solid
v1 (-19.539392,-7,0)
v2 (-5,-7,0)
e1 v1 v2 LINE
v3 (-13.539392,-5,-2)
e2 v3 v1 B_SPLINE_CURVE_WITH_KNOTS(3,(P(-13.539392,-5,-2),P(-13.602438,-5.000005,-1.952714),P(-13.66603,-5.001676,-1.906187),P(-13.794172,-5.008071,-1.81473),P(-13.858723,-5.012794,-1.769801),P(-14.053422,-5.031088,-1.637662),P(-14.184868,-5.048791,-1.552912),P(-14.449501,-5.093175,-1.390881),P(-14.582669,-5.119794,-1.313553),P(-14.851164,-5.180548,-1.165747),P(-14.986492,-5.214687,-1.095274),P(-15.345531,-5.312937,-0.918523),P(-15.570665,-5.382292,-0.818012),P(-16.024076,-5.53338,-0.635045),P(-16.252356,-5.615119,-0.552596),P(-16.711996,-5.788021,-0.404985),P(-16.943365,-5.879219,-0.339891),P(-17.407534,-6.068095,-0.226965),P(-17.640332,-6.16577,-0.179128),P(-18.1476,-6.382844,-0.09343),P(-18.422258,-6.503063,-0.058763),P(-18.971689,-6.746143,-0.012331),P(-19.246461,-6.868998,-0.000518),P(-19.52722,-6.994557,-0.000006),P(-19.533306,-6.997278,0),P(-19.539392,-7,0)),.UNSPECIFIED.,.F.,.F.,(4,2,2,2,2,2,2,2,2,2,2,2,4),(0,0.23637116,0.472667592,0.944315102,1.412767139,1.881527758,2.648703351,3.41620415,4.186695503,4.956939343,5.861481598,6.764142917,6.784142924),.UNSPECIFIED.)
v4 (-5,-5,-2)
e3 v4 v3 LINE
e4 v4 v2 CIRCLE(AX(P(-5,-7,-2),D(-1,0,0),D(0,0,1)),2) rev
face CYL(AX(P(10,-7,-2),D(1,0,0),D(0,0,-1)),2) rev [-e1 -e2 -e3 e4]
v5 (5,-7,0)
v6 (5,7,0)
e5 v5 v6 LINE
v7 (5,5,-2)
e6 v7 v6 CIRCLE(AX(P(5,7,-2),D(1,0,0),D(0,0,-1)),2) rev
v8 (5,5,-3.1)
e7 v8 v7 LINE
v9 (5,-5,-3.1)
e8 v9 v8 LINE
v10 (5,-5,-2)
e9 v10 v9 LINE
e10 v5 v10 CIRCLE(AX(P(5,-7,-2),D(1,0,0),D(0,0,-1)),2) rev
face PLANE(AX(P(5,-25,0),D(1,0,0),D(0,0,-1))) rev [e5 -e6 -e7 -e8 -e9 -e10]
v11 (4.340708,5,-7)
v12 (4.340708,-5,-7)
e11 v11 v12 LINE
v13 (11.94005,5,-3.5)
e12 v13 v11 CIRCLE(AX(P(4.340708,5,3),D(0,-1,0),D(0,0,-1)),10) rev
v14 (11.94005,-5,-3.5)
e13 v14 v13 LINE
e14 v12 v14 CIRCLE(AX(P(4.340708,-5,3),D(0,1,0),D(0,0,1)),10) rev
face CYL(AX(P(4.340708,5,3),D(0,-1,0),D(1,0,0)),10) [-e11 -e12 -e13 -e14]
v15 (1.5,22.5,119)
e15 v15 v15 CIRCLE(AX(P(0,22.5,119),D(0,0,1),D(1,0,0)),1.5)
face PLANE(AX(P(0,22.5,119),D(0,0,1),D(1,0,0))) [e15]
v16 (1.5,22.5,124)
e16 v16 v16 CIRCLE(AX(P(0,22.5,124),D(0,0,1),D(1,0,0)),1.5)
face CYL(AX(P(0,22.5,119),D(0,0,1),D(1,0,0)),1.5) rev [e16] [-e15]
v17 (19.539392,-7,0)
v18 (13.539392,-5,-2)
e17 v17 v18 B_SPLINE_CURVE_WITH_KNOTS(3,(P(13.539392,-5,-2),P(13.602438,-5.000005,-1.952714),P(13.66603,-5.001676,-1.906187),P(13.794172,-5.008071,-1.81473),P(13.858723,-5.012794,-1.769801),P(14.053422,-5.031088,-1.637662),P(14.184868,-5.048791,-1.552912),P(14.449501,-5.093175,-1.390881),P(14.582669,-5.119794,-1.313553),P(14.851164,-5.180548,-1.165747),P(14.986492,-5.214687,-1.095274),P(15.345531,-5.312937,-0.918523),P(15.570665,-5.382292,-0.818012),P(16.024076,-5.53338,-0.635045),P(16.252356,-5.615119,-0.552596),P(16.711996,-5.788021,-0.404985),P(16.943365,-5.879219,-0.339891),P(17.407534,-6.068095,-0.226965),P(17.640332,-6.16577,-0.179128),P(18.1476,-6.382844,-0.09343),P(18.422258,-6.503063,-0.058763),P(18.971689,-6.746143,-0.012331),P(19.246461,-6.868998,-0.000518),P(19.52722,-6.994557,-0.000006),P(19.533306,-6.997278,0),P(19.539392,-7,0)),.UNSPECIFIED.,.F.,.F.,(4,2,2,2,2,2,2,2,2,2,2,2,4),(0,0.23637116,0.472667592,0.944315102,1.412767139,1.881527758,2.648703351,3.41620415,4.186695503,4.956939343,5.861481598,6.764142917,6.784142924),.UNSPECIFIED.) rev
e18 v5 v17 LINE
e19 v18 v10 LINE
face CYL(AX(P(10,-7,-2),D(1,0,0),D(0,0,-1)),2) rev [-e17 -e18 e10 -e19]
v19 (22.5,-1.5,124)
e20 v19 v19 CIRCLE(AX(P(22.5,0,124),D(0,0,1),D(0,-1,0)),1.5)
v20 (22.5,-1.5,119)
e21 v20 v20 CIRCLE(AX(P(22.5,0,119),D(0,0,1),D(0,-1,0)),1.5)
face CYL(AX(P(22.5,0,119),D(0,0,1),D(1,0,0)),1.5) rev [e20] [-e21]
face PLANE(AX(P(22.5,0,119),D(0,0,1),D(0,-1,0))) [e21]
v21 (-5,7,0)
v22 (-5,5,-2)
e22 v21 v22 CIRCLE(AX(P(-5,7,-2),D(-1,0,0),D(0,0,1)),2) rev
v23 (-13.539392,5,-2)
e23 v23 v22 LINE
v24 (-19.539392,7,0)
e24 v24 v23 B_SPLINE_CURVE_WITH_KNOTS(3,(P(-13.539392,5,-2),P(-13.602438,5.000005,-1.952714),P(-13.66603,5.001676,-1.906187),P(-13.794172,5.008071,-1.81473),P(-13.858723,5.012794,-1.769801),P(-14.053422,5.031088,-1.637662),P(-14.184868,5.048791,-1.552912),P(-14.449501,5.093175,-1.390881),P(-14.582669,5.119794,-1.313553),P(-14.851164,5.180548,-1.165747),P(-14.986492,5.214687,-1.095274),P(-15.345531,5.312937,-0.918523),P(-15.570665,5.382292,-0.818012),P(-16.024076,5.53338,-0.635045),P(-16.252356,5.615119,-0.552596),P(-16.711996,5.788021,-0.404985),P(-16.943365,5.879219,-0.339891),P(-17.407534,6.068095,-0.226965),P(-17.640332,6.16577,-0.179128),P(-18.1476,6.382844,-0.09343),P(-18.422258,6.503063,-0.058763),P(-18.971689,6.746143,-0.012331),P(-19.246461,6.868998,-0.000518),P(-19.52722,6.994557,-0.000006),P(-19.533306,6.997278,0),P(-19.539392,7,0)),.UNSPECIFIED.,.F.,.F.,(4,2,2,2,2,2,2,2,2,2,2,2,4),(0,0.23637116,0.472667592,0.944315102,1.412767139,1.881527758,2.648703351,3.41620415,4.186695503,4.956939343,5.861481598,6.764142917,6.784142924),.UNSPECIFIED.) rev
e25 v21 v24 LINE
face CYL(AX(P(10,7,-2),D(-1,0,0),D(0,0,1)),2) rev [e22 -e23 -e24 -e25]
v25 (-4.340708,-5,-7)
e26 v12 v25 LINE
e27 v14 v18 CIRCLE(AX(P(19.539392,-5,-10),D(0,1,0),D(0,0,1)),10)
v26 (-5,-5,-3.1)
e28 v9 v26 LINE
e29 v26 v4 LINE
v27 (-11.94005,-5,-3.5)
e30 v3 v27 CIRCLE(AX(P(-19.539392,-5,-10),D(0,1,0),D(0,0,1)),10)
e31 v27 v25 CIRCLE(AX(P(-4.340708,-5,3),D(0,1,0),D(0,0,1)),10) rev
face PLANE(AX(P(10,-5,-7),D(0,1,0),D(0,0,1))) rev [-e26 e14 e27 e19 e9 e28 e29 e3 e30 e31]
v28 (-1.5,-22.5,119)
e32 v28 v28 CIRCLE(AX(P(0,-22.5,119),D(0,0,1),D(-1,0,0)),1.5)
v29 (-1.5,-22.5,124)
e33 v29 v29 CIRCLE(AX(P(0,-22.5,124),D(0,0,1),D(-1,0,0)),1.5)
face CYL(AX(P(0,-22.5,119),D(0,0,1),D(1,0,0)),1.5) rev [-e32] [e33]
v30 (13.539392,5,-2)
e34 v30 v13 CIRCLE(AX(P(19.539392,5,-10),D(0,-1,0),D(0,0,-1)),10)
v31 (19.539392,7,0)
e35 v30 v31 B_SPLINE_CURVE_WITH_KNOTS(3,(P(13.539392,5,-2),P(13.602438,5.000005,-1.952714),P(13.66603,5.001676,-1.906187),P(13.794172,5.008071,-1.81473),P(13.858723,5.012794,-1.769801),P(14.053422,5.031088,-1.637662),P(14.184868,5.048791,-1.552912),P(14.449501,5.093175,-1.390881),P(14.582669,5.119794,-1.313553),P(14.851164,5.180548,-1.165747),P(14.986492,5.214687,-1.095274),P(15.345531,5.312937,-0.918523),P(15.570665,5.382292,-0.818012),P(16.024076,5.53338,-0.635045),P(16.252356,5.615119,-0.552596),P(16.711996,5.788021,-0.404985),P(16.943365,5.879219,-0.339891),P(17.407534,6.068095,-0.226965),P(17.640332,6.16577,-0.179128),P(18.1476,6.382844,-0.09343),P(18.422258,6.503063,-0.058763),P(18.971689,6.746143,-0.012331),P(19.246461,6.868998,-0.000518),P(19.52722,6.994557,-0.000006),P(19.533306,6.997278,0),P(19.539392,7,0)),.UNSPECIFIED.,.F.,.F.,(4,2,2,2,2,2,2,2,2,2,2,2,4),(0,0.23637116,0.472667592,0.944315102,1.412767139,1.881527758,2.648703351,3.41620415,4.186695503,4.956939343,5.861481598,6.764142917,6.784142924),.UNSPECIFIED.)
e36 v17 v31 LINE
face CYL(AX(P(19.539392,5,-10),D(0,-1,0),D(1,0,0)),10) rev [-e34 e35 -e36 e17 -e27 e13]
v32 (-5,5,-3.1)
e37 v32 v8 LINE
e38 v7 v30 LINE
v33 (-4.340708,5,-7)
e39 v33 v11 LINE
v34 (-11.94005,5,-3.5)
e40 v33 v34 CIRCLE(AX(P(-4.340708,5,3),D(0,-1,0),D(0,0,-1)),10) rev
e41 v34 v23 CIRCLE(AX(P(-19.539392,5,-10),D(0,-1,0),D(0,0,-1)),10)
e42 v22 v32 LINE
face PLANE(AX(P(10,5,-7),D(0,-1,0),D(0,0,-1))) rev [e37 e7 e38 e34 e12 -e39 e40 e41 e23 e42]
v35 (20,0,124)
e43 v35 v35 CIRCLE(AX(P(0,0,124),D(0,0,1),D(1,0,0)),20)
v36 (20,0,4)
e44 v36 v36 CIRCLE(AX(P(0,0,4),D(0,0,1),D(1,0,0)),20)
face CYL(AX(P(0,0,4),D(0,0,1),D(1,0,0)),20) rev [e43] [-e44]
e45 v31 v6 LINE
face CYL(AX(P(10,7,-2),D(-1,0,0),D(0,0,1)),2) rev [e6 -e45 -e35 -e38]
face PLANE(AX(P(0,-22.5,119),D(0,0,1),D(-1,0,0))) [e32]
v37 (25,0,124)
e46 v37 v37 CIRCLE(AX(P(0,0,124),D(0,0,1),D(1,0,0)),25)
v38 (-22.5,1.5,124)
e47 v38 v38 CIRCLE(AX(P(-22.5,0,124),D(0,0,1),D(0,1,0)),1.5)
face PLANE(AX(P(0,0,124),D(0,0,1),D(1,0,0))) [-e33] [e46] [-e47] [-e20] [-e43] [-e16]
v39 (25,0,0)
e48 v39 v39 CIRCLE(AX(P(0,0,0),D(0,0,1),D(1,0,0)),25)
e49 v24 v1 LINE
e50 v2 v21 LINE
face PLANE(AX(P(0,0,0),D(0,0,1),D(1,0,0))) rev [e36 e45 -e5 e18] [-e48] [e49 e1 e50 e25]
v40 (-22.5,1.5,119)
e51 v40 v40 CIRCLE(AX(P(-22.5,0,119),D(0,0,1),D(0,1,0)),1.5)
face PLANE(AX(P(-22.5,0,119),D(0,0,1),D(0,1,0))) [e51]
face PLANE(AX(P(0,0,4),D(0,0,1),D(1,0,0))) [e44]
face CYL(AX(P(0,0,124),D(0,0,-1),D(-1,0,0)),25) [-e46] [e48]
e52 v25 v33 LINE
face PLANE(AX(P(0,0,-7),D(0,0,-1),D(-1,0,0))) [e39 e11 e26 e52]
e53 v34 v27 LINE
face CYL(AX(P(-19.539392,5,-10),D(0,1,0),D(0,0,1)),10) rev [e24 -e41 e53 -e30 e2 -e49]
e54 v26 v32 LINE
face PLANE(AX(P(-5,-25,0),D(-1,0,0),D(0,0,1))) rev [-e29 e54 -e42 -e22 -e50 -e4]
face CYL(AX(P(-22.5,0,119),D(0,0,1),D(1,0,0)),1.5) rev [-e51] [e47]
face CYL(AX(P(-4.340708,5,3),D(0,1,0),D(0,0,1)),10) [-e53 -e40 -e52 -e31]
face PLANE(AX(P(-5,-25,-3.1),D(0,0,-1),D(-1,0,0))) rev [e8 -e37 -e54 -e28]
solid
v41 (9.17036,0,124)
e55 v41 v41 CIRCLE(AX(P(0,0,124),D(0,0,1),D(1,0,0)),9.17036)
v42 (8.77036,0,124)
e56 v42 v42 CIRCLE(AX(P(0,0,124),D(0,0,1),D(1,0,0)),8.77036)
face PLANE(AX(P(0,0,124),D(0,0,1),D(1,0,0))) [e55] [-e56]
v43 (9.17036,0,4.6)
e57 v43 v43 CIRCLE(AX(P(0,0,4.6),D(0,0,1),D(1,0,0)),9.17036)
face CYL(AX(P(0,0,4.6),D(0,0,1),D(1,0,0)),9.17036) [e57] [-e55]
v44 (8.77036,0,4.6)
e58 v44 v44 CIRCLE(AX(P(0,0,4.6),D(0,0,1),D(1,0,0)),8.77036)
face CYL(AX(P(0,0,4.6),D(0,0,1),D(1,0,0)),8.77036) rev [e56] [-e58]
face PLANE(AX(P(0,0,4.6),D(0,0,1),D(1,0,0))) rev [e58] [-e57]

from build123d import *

# Parameters (mm, degrees)
SKETCH1_R               = 25
BOSS_EXTRUDE2_DEPTH     = 124
SKETCH3_R               = 20
CUT_EXTRUDE1_DEPTH      = 120
SKETCH4_W               = 20
SKETCH4_H               = 10
BOSS_EXTRUDE3_DEPTH     = 7
FILLET1_R               = 10
FILLET2_R               = 10
FILLET3_R               = 2
CUT_EXTRUDE2_DEPTH      = 131.003846097
CUT_EXTRUDE2_DEPTH_BACK = 131.003846097
SKETCH5_W               = 10
SKETCH5_H               = 3.1
SKETCH6_R               = 1.5
CUT_EXTRUDE3_DEPTH      = 5
CIRPATTERN1_START       = 119
CIRPATTERN1_OUTLINE_R   = 1.5
CIRPATTERN1_DEPTH       = 5
SKETCH8_R               = 9.170359624
SKETCH8_R_2             = 8.770359624
BOSS_EXTRUDE4_DEPTH     = 119.4


# Read off the part's stored shape, not the designer's step: CirPattern1
with BuildPart() as part:
    # Sketch1 → Boss-Extrude2 (new body)
    with BuildSketch(Plane.XY):
        Circle(SKETCH1_R)
    extrude(amount=BOSS_EXTRUDE2_DEPTH)

    # Sketch3 → Cut-Extrude1 (cut)
    with BuildSketch(Plane.XY.offset(124)):
        Circle(SKETCH3_R)
    extrude(amount=-CUT_EXTRUDE1_DEPTH, mode=Mode.SUBTRACT)

    # Sketch4 → Boss-Extrude3 (add)
    with BuildSketch(Plane(origin=(0, 0, 0), x_dir=(-1, 0, 0), z_dir=(0, 0, -1))):
        Rectangle(SKETCH4_W, SKETCH4_H)
    extrude(amount=BOSS_EXTRUDE3_DEPTH)

    # Fillet1
    # the kernel refuses this fillet: 10 mm, written as the material it adds along each edge
    with BuildSketch(Plane(origin=(-10, 5, 0), x_dir=(-1, 0, 0), z_dir=(0, -1, 0)), Plane(origin=(10, -5, 0), x_dir=(1, 0, 0), z_dir=(0, 1, 0))) as fillet1_piece_1:
        with BuildLine():
            CenterArc((9.539392014, 10), FILLET1_R, 197.457603124, 72.542396876)
            Line((0, 7), (-0.19078784, 6.94))
            ThreePointArc((-0.19078784, 6.94), (-0.2, 3.5), (-0.2, 0))
            Line((-0.2, 0), (0, -0.2))
            Line((0, -0.2), (9.539392014, -0.2))
            Line((9.539392014, -0.2), (9.539392014, 0))
        make_face()
    extrude(amount=10)

    # Fillet2
    fillet2_edges = [part.edges().sort_by_distance(p)[0] for p in [
        (-10, 0, -7),
        (10, 0, -7),
    ]]
    fillet(fillet2_edges, radius=FILLET2_R)

    # Fillet3
    fillet3_edges = [part.edges().sort_by_distance(p)[0] for p in [
        (0, 5, 0),
        (0, -5, 0),
    ]]
    fillet(fillet3_edges, radius=FILLET3_R)

    # Sketch5 → Cut-Extrude2 (cut, two sides: drawn at the far end of the back side and taken through both)
    with BuildSketch(Plane(origin=(0, 5, 0), x_dir=(1, 0, 0), z_dir=(0, 1, 0)).offset(-CUT_EXTRUDE2_DEPTH_BACK)):
        with Locations((0, 1.55)):
            Rectangle(SKETCH5_W, SKETCH5_H)
    extrude(amount=CUT_EXTRUDE2_DEPTH + CUT_EXTRUDE2_DEPTH_BACK, mode=Mode.SUBTRACT)

    # Sketch6 → Cut-Extrude3 (cut)
    with BuildSketch(Plane.XY.offset(124)):
        with Locations((0, 22.5)):
            Circle(SKETCH6_R)
    extrude(amount=-CUT_EXTRUDE3_DEPTH, mode=Mode.SUBTRACT)

    # CirPattern1 outline → CirPattern1 (cut)
    with BuildSketch(Plane.XY.offset(CIRPATTERN1_START)):
        with Locations((-22.5, 0)):
            Circle(CIRPATTERN1_OUTLINE_R)
        with Locations((0, -22.5)):
            Circle(CIRPATTERN1_OUTLINE_R)
        with Locations((22.5, 0)):
            Circle(CIRPATTERN1_OUTLINE_R)
    extrude(amount=CIRPATTERN1_DEPTH, mode=Mode.SUBTRACT)


with BuildPart() as body_2:
    # Sketch8 → Boss-Extrude4 (new body)
    with BuildSketch(Plane.XY.offset(124)):
        Circle(SKETCH8_R)
        Circle(SKETCH8_R_2, mode=Mode.SUBTRACT)
    extrude(amount=-BOSS_EXTRUDE4_DEPTH)


solid = Compound([part.part, body_2.part])
